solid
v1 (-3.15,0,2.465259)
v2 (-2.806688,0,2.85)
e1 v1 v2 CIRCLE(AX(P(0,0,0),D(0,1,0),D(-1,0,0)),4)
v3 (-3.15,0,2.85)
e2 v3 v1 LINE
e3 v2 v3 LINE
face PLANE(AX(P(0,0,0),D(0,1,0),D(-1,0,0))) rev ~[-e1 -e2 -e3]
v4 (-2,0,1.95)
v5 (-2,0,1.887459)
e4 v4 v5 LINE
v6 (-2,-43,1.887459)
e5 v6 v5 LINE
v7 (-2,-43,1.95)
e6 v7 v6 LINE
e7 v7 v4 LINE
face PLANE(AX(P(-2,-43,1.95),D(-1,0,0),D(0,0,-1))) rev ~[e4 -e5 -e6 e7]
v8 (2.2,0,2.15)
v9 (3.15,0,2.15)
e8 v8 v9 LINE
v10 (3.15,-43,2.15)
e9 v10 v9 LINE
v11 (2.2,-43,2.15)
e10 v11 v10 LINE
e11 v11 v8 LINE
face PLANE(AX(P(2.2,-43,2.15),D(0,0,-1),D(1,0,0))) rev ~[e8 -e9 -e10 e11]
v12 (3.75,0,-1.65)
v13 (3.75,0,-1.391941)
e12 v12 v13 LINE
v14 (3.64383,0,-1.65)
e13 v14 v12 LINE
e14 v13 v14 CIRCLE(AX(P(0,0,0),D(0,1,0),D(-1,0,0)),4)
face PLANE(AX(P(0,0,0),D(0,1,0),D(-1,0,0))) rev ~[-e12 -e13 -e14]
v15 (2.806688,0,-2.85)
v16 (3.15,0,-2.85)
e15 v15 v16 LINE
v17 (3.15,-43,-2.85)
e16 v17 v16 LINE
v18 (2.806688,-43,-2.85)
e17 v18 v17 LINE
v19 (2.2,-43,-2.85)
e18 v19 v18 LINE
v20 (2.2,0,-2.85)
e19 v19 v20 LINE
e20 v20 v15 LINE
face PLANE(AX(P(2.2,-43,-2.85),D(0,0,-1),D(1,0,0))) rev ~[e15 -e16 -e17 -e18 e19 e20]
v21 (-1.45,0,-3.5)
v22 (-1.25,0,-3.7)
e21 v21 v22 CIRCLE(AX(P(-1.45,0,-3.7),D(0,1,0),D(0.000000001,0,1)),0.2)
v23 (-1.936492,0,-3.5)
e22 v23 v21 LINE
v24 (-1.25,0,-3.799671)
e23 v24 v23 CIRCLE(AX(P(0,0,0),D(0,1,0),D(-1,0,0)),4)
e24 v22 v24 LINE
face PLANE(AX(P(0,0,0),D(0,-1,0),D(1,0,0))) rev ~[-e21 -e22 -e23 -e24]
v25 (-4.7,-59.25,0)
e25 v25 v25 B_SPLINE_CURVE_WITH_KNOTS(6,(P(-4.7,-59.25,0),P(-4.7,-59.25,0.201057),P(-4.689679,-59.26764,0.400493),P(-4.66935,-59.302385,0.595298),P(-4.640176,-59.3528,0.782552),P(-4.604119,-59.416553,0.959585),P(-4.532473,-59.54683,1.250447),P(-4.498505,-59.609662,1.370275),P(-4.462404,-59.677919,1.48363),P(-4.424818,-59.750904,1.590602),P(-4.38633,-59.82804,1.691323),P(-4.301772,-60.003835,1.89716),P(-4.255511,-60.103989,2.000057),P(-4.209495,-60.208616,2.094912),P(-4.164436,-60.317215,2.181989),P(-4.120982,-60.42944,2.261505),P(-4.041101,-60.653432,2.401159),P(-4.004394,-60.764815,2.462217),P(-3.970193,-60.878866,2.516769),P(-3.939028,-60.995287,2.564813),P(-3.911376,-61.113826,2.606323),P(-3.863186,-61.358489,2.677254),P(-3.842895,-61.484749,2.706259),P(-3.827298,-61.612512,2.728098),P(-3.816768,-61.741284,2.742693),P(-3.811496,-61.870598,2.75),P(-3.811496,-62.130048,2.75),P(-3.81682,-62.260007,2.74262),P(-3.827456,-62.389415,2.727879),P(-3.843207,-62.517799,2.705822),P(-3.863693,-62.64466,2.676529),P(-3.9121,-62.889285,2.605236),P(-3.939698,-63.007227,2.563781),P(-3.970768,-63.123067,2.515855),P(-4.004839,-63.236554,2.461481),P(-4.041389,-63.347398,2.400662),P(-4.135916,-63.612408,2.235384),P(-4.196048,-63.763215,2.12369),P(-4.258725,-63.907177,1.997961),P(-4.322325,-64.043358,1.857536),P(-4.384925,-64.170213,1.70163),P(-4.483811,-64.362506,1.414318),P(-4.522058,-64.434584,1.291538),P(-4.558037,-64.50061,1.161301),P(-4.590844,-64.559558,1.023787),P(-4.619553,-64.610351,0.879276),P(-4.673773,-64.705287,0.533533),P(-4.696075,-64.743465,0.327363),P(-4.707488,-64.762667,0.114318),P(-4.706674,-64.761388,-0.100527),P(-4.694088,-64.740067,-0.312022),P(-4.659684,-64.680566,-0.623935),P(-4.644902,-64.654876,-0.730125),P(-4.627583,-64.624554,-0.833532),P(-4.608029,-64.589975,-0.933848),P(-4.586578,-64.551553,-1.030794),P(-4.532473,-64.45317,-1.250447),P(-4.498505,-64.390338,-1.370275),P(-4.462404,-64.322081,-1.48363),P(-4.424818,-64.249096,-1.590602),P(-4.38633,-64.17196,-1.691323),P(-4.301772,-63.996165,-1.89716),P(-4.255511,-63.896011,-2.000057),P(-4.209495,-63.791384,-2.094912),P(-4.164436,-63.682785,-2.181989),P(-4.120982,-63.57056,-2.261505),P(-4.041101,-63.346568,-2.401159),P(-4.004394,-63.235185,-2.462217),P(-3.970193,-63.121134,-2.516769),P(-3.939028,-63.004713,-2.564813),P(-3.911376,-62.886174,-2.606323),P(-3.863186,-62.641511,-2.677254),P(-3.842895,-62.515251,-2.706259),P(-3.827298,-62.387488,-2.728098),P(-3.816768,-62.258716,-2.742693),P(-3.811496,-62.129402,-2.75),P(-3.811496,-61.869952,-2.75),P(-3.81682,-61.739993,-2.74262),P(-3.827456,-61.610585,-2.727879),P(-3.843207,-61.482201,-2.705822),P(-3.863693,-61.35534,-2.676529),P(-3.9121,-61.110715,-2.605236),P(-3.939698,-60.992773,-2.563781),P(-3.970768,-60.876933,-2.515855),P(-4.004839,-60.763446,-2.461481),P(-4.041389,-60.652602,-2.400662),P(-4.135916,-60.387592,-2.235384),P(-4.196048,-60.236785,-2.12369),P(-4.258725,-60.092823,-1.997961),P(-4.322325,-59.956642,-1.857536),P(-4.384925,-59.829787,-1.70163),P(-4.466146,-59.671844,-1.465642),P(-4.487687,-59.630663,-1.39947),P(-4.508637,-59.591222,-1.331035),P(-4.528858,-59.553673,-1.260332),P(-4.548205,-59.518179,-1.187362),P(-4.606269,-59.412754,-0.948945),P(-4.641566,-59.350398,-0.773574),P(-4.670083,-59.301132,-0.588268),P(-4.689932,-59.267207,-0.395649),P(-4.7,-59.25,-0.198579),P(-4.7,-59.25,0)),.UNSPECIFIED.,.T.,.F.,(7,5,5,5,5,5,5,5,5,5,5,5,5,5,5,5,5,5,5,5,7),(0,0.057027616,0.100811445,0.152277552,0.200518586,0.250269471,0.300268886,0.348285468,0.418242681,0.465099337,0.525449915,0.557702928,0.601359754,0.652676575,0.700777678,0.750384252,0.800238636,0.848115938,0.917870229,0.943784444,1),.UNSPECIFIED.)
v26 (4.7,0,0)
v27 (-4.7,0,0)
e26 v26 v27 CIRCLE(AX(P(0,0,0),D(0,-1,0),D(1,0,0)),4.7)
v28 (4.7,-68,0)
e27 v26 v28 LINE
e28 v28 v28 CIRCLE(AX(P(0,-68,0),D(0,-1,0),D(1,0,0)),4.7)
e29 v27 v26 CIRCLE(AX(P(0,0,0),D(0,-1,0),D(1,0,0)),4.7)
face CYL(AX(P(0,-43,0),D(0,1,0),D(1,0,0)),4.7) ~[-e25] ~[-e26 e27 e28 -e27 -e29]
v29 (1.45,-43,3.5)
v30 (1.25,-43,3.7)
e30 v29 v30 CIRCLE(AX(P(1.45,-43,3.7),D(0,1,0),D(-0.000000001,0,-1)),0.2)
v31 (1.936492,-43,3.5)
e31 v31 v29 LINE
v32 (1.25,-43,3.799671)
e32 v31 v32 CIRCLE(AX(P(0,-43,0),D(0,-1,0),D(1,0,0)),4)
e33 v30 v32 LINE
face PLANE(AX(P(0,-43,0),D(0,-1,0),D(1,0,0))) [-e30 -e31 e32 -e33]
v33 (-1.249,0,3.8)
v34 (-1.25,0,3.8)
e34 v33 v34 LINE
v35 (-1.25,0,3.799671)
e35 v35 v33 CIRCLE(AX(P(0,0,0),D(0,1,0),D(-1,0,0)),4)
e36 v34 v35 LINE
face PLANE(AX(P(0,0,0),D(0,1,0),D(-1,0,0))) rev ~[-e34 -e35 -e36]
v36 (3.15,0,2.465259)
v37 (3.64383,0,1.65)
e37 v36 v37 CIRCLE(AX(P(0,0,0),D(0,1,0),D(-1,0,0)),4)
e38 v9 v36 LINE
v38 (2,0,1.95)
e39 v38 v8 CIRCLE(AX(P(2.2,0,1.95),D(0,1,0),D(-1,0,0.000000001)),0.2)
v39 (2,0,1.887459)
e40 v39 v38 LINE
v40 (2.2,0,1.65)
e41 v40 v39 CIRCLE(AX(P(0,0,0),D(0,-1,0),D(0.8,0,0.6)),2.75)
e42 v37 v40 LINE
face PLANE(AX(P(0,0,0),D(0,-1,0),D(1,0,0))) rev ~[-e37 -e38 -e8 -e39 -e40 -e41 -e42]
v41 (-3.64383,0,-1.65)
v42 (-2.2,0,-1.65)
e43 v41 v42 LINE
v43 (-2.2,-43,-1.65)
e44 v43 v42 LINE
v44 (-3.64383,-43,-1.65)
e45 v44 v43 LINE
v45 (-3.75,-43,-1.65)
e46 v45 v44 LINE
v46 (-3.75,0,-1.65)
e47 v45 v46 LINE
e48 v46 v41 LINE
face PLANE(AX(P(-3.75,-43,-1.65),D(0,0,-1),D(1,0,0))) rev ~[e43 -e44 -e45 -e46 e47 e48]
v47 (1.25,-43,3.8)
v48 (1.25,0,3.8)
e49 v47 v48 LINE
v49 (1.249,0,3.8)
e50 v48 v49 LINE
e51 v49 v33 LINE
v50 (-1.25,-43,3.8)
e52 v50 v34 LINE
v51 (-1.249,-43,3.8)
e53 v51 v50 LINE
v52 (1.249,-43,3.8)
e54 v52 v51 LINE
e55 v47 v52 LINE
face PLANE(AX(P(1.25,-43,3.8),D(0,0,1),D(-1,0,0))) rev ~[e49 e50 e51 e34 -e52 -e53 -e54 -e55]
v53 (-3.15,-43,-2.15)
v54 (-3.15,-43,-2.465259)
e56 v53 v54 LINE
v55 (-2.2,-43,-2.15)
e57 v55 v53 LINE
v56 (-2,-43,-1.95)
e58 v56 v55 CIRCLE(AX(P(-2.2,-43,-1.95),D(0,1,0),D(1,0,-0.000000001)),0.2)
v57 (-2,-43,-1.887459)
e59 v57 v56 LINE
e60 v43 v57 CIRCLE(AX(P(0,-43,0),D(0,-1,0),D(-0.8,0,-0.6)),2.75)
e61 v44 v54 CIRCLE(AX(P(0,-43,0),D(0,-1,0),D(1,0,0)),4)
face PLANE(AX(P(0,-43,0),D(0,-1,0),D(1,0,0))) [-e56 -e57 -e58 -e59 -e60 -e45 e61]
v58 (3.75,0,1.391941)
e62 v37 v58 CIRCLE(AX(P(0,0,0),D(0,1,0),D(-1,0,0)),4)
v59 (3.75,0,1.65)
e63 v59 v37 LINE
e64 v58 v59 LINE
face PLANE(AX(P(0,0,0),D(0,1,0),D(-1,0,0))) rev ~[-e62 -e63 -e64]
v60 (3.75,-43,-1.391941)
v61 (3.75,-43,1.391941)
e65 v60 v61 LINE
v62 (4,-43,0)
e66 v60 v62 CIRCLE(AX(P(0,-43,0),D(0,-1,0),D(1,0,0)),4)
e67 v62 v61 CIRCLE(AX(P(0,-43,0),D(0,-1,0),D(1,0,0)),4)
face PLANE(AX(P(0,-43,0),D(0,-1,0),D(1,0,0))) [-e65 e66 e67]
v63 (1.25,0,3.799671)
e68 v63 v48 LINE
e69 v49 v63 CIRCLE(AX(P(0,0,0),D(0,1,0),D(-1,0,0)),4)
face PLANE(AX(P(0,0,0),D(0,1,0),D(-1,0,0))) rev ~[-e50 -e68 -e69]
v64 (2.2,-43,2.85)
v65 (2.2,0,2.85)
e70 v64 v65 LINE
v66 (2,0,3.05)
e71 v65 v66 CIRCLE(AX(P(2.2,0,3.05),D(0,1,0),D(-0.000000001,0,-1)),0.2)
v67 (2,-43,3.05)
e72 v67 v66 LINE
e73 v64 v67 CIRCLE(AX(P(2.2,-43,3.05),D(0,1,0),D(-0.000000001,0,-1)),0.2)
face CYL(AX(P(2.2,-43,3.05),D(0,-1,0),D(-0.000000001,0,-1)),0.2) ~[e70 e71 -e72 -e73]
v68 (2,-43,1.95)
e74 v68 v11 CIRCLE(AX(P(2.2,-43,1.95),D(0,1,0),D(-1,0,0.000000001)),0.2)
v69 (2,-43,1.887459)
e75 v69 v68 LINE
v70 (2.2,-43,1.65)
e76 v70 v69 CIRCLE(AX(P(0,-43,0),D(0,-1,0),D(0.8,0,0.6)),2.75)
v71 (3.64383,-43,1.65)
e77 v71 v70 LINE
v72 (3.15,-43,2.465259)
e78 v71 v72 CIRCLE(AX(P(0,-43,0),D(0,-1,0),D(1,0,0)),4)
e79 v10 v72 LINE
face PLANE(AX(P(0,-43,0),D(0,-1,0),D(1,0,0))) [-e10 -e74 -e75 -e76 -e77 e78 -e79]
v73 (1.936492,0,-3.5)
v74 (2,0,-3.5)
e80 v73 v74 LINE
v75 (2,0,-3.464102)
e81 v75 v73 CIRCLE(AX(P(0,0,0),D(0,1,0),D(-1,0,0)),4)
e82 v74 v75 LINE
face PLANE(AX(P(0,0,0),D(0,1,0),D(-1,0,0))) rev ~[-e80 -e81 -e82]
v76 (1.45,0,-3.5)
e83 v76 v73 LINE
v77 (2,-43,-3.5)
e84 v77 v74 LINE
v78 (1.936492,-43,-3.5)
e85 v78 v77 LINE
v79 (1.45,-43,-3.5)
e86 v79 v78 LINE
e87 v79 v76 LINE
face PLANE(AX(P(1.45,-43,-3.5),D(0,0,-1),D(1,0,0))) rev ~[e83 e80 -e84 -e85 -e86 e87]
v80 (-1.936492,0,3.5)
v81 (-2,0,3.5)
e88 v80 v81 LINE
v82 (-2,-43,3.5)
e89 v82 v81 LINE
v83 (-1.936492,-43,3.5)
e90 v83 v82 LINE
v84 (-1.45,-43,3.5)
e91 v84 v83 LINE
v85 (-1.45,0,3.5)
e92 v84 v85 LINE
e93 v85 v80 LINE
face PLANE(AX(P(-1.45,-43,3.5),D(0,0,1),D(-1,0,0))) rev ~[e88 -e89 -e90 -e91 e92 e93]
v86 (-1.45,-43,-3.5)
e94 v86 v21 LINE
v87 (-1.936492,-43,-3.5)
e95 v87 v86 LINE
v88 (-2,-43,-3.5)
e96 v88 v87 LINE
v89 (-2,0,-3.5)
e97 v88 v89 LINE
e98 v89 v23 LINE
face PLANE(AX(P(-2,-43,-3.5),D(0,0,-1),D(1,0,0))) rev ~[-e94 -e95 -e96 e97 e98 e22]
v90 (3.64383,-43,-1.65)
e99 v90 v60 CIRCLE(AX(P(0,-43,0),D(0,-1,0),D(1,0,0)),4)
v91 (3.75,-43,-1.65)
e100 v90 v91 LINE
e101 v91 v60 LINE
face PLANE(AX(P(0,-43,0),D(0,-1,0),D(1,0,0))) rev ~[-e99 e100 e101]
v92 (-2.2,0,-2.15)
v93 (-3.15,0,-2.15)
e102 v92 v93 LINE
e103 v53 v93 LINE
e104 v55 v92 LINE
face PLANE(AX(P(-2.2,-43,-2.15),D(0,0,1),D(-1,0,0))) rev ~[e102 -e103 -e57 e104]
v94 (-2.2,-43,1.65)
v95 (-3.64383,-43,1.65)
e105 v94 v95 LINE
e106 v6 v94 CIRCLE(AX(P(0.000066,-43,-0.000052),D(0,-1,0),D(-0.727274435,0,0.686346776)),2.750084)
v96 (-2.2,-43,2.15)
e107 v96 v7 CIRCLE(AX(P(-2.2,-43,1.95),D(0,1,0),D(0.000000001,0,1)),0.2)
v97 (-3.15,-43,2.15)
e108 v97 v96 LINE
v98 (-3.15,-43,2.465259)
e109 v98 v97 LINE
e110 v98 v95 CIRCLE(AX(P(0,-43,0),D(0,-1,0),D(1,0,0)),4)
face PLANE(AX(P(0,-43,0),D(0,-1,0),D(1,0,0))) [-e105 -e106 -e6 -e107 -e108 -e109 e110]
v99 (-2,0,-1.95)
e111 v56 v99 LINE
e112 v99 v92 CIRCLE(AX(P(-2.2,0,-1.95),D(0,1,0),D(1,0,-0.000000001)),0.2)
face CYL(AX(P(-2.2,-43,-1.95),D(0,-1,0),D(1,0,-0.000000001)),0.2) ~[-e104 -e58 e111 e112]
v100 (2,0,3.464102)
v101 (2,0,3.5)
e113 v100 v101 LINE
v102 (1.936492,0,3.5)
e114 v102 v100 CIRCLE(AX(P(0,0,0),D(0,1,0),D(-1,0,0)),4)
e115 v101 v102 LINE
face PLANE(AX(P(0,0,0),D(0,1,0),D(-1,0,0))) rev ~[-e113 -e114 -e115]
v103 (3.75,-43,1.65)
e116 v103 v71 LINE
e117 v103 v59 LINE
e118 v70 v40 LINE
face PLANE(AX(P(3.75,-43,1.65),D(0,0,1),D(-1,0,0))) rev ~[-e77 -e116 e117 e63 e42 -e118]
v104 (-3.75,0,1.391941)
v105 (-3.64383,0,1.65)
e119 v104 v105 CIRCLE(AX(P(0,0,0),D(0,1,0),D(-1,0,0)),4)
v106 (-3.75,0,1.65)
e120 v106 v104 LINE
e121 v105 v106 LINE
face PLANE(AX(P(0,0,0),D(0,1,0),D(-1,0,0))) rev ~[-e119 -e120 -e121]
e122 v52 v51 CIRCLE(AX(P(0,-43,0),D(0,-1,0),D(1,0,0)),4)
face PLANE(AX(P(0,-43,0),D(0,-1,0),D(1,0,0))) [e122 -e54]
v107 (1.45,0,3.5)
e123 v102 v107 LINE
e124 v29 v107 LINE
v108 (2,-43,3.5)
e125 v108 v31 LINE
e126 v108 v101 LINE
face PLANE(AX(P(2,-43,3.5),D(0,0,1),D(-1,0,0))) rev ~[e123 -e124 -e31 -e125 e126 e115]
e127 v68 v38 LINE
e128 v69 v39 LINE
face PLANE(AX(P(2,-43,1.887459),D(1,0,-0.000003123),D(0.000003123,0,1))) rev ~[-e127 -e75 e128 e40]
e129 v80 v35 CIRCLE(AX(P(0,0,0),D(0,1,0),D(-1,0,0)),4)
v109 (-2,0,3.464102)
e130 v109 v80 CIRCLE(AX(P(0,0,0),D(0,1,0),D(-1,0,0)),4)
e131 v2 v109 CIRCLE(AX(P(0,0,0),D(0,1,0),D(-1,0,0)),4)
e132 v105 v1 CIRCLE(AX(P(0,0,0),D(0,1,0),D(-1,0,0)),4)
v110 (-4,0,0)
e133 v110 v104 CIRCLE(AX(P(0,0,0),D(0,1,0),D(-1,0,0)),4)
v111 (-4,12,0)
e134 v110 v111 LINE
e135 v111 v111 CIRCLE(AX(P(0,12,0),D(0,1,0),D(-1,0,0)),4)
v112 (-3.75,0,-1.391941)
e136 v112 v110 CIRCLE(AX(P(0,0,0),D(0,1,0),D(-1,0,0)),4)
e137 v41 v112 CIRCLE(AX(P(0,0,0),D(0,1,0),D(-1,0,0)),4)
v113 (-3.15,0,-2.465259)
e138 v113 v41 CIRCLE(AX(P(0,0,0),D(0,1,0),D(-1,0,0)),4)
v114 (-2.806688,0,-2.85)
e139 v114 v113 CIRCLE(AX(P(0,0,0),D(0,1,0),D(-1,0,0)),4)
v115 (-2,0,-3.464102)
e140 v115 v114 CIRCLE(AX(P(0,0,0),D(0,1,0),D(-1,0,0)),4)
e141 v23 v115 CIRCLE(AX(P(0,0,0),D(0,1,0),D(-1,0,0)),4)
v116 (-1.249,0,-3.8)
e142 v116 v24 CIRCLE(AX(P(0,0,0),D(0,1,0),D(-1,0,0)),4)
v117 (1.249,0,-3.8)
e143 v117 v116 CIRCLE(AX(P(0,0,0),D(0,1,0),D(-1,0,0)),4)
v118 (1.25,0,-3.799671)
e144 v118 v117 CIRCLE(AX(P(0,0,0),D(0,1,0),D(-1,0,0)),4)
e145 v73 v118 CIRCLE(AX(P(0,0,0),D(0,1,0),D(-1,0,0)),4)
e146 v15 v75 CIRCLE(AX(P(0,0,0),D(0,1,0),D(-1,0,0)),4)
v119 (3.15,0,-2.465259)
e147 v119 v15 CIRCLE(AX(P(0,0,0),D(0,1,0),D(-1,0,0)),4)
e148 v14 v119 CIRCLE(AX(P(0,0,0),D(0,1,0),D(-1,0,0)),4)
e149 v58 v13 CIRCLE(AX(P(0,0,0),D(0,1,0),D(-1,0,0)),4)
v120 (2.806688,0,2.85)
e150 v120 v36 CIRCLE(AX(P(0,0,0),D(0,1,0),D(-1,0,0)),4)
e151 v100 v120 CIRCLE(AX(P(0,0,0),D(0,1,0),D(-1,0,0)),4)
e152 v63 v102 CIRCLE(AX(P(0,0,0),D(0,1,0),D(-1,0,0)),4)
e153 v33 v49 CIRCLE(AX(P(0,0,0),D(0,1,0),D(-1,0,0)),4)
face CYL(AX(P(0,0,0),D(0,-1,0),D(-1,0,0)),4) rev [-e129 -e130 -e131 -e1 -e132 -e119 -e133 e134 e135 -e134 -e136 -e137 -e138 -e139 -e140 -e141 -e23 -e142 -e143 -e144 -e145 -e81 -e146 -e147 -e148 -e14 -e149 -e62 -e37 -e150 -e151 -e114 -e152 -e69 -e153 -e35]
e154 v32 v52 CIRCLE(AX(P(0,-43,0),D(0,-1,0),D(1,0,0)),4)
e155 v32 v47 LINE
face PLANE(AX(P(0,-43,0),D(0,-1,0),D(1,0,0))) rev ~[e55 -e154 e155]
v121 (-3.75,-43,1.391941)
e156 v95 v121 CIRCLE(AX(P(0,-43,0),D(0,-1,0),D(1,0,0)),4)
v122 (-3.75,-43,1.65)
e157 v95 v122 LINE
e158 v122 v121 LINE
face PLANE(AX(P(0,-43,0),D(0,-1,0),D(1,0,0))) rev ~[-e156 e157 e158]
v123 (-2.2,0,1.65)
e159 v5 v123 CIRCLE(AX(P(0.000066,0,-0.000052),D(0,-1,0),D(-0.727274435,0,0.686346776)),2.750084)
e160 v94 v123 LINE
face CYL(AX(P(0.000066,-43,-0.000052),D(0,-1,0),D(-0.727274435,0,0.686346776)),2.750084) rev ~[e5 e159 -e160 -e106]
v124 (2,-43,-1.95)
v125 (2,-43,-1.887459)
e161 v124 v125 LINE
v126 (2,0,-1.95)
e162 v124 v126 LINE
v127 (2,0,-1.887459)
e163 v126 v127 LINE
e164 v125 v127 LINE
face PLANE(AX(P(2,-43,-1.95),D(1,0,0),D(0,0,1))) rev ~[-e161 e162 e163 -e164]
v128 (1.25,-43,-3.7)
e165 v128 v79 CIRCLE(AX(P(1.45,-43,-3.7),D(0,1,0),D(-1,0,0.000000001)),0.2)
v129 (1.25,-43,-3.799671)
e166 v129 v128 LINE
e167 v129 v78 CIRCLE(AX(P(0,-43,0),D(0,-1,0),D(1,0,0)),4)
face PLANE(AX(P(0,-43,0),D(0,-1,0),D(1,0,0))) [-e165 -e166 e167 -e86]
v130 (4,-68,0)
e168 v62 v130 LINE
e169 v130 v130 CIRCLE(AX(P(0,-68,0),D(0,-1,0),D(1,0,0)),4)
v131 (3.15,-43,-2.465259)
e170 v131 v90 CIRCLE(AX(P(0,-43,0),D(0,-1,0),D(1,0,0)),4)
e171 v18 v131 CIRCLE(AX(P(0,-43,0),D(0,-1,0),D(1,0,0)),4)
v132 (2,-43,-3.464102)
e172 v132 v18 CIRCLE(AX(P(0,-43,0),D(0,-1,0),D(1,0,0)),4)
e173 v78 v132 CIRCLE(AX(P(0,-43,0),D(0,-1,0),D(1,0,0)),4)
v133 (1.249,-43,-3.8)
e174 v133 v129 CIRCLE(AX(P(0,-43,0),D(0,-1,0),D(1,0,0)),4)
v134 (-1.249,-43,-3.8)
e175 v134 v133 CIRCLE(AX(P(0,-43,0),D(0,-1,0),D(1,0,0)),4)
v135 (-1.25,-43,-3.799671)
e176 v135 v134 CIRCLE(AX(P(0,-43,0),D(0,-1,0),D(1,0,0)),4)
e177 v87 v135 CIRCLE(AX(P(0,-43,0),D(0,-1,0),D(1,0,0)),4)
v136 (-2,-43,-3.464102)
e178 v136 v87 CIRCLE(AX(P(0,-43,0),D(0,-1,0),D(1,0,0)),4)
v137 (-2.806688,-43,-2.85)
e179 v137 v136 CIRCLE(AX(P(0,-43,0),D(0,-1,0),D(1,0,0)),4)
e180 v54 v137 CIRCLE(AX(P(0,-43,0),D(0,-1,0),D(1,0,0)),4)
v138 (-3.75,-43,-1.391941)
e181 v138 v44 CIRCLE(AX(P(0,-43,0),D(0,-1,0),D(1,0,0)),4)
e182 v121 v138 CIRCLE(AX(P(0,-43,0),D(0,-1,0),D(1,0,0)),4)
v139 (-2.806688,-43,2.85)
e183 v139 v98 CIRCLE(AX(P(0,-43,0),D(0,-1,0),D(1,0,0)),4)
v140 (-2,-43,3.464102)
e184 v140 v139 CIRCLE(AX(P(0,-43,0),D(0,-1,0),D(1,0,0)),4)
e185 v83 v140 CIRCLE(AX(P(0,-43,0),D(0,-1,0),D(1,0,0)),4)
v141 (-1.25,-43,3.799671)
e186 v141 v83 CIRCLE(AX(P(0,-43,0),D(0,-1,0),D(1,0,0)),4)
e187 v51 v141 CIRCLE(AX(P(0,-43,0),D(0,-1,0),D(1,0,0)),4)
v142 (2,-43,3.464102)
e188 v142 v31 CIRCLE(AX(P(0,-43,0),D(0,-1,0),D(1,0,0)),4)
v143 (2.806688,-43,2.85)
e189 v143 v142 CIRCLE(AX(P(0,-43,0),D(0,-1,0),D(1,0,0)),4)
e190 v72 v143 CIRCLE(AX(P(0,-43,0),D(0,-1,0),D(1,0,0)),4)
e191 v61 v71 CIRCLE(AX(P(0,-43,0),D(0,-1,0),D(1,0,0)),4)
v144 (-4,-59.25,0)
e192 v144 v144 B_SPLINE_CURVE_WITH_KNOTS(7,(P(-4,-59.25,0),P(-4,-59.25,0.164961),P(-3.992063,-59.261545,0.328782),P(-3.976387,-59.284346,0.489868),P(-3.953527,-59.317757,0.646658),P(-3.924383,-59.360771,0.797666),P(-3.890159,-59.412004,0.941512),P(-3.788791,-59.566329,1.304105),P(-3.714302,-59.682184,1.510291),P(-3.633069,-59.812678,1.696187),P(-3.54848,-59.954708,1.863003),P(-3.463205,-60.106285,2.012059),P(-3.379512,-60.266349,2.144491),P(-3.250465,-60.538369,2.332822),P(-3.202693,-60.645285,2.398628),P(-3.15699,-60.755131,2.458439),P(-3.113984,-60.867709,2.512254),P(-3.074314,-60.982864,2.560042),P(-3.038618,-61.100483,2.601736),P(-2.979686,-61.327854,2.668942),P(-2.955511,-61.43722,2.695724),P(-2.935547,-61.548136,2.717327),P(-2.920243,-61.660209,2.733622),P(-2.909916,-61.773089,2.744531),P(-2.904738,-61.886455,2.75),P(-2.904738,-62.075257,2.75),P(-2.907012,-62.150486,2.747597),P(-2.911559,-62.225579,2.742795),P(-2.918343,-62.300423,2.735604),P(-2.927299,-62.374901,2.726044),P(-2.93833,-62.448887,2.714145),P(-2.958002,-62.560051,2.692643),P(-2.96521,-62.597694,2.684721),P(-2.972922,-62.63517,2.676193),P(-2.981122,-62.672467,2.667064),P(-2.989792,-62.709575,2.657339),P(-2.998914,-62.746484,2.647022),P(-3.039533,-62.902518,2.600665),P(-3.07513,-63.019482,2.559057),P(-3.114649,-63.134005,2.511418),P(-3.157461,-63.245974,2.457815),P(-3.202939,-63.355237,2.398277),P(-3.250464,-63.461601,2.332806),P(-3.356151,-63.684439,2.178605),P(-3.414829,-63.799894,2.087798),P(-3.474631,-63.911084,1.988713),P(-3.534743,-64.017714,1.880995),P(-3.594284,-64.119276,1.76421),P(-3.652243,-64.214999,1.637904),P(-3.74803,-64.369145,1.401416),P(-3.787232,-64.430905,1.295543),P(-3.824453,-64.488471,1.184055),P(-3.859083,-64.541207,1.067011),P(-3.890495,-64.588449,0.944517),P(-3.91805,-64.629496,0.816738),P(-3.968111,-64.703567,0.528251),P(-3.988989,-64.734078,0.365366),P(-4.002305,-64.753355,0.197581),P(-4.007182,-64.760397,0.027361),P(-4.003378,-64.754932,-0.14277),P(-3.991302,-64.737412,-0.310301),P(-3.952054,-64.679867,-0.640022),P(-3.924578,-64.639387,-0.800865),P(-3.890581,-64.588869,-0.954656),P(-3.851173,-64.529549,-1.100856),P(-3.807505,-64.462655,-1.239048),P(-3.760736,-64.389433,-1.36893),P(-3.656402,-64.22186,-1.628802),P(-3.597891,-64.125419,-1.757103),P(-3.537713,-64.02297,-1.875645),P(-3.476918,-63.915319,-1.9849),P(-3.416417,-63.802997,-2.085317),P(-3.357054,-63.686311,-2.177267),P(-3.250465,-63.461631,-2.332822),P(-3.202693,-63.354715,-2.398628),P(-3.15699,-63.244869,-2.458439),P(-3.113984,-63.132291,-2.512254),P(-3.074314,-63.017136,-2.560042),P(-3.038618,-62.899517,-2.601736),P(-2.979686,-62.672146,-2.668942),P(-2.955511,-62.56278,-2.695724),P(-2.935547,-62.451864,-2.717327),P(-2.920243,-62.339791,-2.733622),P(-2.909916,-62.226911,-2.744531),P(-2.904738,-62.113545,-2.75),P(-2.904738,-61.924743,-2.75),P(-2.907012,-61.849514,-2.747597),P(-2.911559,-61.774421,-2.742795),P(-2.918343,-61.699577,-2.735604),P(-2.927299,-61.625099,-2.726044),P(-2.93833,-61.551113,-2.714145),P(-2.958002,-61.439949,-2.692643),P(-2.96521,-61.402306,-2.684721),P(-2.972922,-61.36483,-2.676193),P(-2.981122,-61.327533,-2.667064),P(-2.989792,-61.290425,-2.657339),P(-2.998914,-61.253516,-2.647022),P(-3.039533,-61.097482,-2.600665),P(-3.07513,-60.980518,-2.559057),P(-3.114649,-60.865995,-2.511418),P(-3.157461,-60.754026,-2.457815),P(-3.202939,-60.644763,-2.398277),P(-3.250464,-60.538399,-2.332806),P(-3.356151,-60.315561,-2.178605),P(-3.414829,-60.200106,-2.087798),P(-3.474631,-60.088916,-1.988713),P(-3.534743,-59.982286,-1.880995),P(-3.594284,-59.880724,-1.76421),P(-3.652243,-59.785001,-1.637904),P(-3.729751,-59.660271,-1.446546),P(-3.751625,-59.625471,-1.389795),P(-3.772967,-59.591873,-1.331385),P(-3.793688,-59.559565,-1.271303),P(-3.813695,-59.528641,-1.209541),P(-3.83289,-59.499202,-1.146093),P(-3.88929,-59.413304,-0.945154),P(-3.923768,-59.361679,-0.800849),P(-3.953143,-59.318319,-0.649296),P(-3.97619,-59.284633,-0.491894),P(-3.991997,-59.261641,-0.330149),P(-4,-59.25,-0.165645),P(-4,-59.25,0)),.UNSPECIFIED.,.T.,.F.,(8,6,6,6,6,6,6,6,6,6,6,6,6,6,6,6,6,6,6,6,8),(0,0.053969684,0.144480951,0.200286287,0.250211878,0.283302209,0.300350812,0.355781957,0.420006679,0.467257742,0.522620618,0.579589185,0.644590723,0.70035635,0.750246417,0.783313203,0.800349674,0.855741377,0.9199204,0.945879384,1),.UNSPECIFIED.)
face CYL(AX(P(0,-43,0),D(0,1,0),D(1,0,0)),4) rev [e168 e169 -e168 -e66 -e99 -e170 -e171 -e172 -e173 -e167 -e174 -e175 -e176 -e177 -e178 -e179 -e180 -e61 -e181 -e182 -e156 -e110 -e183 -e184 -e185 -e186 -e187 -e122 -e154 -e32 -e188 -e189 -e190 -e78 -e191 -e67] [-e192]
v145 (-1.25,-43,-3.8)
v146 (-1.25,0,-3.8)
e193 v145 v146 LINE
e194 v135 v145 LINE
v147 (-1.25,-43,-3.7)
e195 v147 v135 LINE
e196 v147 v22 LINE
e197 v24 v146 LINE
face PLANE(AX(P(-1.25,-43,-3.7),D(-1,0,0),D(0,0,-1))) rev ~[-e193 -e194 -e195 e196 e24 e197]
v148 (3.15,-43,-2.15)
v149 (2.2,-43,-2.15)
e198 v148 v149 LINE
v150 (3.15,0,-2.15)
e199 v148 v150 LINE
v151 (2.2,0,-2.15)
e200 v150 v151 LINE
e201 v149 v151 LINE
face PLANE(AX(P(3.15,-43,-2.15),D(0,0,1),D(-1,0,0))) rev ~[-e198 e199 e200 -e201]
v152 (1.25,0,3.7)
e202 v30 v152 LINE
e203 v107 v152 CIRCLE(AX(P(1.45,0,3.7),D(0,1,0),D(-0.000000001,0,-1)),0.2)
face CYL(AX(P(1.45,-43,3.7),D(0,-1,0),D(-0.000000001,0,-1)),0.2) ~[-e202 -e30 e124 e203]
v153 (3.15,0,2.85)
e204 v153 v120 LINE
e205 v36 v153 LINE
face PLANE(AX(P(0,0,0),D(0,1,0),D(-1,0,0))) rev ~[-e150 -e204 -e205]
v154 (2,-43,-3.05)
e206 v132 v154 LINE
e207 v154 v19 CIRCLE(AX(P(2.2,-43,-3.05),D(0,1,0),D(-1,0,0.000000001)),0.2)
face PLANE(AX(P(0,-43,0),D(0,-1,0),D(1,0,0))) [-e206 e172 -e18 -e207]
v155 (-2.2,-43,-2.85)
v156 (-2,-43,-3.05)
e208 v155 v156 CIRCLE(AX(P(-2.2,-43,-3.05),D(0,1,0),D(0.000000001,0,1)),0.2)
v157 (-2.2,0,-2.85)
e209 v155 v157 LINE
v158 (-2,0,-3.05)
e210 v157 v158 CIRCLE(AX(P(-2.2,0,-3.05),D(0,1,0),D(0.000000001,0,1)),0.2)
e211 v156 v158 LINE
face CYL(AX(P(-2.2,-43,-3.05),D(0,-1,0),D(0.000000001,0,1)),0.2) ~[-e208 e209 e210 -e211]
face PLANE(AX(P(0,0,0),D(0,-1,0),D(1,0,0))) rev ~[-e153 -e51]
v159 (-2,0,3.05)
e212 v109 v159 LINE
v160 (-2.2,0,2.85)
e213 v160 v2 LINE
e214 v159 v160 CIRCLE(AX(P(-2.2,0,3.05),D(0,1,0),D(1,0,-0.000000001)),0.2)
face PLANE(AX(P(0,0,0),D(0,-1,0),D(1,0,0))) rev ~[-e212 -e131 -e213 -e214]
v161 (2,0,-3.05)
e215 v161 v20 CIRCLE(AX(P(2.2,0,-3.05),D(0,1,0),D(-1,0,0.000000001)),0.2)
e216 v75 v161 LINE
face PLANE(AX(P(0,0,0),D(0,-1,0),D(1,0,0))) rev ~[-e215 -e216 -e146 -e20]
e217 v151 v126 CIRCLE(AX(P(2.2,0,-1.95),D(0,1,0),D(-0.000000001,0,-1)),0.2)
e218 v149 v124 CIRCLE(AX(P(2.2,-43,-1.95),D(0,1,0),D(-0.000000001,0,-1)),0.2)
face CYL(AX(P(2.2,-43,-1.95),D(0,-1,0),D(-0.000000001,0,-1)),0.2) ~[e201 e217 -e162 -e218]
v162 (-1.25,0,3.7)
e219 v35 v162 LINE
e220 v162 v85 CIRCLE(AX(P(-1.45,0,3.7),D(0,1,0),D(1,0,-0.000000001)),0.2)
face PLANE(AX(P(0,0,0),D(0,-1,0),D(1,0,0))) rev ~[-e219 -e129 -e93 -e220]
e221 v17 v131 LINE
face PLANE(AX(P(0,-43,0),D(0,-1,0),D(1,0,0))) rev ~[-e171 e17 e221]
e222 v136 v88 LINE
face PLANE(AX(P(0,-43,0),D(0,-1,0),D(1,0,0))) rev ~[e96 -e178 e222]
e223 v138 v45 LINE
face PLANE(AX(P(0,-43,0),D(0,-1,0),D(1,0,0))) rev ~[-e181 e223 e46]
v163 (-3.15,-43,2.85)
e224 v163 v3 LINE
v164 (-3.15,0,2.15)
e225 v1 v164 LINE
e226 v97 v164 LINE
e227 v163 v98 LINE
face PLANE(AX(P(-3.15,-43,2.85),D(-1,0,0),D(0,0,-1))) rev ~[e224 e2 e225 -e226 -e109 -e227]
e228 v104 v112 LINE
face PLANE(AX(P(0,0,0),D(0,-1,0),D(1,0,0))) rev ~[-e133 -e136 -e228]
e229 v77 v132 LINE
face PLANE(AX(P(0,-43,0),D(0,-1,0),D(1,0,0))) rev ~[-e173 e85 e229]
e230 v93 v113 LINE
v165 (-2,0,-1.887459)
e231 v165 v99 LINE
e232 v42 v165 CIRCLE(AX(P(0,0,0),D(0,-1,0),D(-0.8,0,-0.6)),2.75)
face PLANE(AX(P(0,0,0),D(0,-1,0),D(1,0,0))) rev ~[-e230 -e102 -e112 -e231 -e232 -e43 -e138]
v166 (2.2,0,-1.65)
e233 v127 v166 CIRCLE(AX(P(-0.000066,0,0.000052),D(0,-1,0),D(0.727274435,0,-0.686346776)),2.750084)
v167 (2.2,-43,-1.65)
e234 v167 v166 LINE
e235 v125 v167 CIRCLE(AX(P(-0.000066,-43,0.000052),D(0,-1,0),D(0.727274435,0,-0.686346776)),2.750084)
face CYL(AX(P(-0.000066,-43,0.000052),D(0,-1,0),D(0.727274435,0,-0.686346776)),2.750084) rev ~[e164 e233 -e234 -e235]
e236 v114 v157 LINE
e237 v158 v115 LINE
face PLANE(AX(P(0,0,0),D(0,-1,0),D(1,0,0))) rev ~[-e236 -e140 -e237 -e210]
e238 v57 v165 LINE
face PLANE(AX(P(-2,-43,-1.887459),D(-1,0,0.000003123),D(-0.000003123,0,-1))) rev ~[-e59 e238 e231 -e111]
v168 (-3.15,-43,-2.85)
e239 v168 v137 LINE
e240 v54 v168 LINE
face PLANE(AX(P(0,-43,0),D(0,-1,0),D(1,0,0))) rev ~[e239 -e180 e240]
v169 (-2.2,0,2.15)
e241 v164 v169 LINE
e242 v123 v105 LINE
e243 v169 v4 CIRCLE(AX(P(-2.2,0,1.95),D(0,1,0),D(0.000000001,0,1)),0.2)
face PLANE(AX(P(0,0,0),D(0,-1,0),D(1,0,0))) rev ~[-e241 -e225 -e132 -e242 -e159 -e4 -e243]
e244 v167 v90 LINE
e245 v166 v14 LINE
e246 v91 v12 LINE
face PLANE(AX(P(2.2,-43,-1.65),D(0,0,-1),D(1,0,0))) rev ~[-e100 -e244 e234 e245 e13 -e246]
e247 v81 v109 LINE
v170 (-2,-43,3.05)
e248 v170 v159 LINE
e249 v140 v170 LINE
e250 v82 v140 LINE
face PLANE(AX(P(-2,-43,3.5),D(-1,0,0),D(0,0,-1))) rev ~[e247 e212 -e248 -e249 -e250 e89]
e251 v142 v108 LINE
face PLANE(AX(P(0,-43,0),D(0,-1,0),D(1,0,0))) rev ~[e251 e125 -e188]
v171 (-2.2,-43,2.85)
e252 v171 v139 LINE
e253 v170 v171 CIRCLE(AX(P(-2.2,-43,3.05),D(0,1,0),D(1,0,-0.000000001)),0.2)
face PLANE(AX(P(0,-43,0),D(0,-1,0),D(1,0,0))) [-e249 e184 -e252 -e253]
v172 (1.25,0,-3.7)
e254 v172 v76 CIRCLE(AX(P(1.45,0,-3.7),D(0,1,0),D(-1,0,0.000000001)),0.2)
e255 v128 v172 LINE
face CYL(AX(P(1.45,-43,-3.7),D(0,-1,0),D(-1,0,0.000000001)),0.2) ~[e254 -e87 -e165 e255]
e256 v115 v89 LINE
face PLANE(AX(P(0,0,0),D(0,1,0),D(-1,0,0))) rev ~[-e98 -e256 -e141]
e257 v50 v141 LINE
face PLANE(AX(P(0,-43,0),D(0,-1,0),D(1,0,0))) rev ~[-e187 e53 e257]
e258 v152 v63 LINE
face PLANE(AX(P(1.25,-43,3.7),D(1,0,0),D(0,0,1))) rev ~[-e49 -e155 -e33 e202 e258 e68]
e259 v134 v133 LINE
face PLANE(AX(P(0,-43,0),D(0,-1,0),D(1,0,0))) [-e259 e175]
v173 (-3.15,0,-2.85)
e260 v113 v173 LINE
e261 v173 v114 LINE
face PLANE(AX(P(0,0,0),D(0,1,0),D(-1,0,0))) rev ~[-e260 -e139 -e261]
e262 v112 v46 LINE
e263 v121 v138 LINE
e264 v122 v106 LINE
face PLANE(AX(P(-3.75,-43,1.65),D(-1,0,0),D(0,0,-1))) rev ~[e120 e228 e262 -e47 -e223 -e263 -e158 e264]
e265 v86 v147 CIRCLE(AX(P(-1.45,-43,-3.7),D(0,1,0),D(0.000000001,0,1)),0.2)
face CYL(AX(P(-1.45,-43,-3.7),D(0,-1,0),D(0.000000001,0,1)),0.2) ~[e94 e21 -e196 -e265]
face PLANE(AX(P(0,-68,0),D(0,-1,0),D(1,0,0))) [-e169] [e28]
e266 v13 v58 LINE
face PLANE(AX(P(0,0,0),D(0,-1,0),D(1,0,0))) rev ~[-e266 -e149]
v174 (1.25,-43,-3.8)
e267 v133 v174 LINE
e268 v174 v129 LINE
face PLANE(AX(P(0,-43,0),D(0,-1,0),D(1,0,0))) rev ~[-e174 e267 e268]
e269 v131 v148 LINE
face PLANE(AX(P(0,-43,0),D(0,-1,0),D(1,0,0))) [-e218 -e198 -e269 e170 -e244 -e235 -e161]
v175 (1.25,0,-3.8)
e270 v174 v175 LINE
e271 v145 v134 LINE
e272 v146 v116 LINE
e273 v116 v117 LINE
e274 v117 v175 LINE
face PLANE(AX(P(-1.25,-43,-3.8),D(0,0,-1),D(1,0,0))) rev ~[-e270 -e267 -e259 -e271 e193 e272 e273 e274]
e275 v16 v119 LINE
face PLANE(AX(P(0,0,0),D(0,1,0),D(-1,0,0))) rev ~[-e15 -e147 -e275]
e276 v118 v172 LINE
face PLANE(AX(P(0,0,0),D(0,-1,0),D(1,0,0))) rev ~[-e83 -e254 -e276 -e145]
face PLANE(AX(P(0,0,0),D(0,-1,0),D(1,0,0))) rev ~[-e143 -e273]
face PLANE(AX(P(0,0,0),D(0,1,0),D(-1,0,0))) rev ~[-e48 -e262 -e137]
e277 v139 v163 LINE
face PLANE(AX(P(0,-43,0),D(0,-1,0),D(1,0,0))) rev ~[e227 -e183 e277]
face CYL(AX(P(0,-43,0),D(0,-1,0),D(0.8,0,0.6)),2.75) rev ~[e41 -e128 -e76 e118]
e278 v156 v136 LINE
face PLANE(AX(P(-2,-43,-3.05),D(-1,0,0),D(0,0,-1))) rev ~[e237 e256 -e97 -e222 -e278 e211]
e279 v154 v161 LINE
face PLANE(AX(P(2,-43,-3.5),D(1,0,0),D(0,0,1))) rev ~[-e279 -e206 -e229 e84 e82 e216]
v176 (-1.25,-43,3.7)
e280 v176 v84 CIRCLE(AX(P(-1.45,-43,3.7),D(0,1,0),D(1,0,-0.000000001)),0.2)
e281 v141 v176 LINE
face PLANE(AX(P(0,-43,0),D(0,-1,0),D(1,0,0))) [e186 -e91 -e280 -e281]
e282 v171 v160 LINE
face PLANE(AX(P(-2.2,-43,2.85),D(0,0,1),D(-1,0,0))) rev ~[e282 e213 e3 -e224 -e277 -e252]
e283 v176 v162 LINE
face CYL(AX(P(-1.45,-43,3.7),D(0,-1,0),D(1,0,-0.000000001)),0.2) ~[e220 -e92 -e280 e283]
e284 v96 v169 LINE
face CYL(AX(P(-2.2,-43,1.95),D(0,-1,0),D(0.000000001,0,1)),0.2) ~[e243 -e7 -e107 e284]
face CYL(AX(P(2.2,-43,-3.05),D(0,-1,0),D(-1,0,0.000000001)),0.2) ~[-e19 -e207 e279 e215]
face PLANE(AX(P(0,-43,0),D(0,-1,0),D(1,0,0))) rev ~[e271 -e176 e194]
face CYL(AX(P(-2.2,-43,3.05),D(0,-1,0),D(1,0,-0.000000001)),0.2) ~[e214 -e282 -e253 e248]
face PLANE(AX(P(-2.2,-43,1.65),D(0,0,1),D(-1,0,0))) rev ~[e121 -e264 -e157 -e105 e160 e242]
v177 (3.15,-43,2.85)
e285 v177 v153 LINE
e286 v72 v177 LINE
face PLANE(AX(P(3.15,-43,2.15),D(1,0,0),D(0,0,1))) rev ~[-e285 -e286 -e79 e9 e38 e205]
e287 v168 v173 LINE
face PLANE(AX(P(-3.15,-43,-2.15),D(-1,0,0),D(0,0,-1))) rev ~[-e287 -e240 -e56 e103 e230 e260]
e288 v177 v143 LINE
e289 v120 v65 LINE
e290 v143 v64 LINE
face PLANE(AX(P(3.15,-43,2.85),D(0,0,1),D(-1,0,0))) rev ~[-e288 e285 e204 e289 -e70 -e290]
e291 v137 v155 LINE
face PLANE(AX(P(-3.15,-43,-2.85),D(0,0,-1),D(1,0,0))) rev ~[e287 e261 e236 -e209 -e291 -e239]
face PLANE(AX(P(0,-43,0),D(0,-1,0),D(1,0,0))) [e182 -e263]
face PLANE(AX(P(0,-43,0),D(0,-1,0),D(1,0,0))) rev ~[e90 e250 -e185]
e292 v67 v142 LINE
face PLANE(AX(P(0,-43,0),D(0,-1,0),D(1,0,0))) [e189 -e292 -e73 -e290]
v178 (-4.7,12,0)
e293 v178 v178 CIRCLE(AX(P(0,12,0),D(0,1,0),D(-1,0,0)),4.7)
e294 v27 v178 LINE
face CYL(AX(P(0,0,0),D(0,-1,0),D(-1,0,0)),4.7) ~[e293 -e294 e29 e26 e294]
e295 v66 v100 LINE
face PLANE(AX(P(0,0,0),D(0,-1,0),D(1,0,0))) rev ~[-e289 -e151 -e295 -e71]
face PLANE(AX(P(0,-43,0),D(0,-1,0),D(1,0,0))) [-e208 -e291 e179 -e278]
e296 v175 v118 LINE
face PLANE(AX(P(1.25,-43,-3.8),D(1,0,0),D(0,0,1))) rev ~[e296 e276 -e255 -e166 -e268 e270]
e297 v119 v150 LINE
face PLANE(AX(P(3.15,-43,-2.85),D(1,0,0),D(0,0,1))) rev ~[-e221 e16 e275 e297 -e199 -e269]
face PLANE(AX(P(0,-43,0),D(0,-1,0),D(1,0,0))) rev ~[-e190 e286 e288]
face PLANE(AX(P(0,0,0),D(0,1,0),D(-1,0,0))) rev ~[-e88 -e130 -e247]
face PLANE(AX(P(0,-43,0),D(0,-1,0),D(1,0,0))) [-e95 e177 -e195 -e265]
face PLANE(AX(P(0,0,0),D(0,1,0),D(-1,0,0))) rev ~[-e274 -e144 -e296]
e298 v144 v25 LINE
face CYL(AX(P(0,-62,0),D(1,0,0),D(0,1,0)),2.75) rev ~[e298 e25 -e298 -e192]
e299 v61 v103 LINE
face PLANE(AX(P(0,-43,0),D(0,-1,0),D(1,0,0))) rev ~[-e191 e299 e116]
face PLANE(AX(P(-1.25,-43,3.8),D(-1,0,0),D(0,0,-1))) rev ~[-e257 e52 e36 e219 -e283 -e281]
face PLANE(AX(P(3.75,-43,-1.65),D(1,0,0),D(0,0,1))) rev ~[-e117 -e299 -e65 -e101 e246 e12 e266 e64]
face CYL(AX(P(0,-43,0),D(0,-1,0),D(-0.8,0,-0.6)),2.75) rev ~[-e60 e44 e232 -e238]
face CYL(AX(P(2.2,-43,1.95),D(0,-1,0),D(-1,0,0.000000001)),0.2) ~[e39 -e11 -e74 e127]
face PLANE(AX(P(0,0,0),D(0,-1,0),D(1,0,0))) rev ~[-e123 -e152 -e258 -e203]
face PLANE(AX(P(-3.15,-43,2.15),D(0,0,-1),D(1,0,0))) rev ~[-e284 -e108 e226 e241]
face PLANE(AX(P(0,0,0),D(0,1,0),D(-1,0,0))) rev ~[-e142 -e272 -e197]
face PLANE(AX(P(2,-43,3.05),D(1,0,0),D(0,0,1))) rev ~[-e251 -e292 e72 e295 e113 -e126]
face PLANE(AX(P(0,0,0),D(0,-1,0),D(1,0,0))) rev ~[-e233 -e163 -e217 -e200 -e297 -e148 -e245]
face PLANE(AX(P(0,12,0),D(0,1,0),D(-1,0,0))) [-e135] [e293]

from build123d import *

# Parameters (mm, degrees)
F3_R      = 4.7
F4_DEPTH  = 43
F8_DEPTH  = 43
F6_R      = 4.7
F6_R_2    = 4
F9_DEPTH  = 25
F7_R      = 4.7
F7_R_2    = 4
F10_DEPTH = 12
F11_R     = 2.75
F12_DEPTH = 4.701


# Not quite as in the source:
# - ends of sketch curves that miss each other by under 0.0002 mm in the source are joined


with BuildPart() as f4:
    # F3 (on Front) → F4 (new body)
    with BuildSketch(Plane.XZ):
        Circle(F3_R)
    extrude(amount=F4_DEPTH)

    # F5 (on face) → F8 (cut, through all)
    with BuildSketch(Plane.XZ.offset(43)):
        with BuildLine():
            Line((-1.25, -3.8), (0, -3.8))
            Line((0, -3.8), (1.25, -3.8))
            Line((1.25, -3.8), (1.25, -3.7))
            ThreePointArc((1.25, -3.7), (1.3085786438, -3.5585786438), (1.45, -3.5))
            Line((1.45, -3.5), (2, -3.5))
            Line((2, -3.5), (2, -3.05))
            ThreePointArc((2, -3.05), (2.0585786438, -2.9085786438), (2.2, -2.85))
            Line((2.2, -2.85), (3.15, -2.85))
            Line((3.15, -2.85), (3.15, -2.15))
            Line((3.15, -2.15), (2.2, -2.15))
            ThreePointArc((2.2, -2.15), (2.0585786438, -2.0914213562), (2, -1.95))
            Line((2, -1.95), (2, -1.887459))
            ThreePointArc((2, -1.887459), (2.1033535752, -1.771554046), (2.2, -1.65))
            Line((2.2, -1.65), (3.75, -1.65))
            Line((3.75, -1.65), (3.75, 0))
            Line((3.75, 0), (3.75, 1.65))
            Line((3.75, 1.65), (2.2, 1.65))
            ThreePointArc((2.2, 1.65), (2.1033535752, 1.771554046), (1.9999998047, 1.8874588157))
            Line((1.9999998047, 1.8874588157), (2, 1.95))
            ThreePointArc((2, 1.95), (2.0585786438, 2.0914213562), (2.2, 2.15))
            Line((2.2, 2.15), (3.15, 2.15))
            Line((3.15, 2.15), (3.15, 2.85))
            Line((3.15, 2.85), (2.2, 2.85))
            ThreePointArc((2.2, 2.85), (2.0585786438, 2.9085786438), (2, 3.05))
            Line((2, 3.05), (2, 3.5))
            Line((2, 3.5), (1.45, 3.5))
            ThreePointArc((1.45, 3.5), (1.3085786438, 3.5585786438), (1.25, 3.7))
            Line((1.25, 3.7), (1.25, 3.8))
            Line((1.25, 3.8), (0, 3.8))
            Line((0, 3.8), (-1.25, 3.8))
            Line((-1.25, 3.8), (-1.25, 3.7))
            ThreePointArc((-1.25, 3.7), (-1.3085786438, 3.5585786438), (-1.45, 3.5))
            Line((-1.45, 3.5), (-2, 3.5))
            Line((-2, 3.5), (-2, 3.05))
            ThreePointArc((-2, 3.05), (-2.0585786438, 2.9085786438), (-2.2, 2.85))
            Line((-2.2, 2.85), (-3.15, 2.85))
            Line((-3.15, 2.85), (-3.15, 2.15))
            Line((-3.15, 2.15), (-2.2, 2.15))
            ThreePointArc((-2.2, 2.15), (-2.0585786438, 2.0914213562), (-2, 1.95))
            Line((-2, 1.95), (-2, 1.887459))
            ThreePointArc((-2, 1.887459), (-2.1033535752, 1.771554046), (-2.2, 1.65))
            Line((-2.2, 1.65), (-3.75, 1.65))
            Line((-3.75, 1.65), (-3.75, 0))
            Line((-3.75, 0), (-3.75, -1.65))
            Line((-3.75, -1.65), (-2.2, -1.65))
            ThreePointArc((-2.2, -1.65), (-2.1033535752, -1.771554046), (-1.9999998047, -1.8874588157))
            Line((-1.9999998047, -1.8874588157), (-2, -1.95))
            ThreePointArc((-2, -1.95), (-2.0585786438, -2.0914213562), (-2.2, -2.15))
            Line((-2.2, -2.15), (-3.15, -2.15))
            Line((-3.15, -2.15), (-3.15, -2.85))
            Line((-3.15, -2.85), (-2.2, -2.85))
            ThreePointArc((-2.2, -2.85), (-2.0585786438, -2.9085786438), (-2, -3.05))
            Line((-2, -3.05), (-2, -3.5))
            Line((-2, -3.5), (-1.45, -3.5))
            ThreePointArc((-1.45, -3.5), (-1.3085786438, -3.5585786438), (-1.25, -3.7))
            Line((-1.25, -3.7), (-1.25, -3.8))
        make_face()
    extrude(amount=-F8_DEPTH, mode=Mode.SUBTRACT)

    # F6 (on face) → F9 (join)
    with BuildSketch(Plane.XZ.offset(43)):
        Circle(F6_R)
        Circle(F6_R_2, mode=Mode.SUBTRACT)
    extrude(amount=F9_DEPTH)

    # F7 (on face) → F10 (join)
    with BuildSketch(Plane(origin=(0, 0, 0), x_dir=(-1, 0, 0), z_dir=(0, 1, 0))):
        Circle(F7_R)
        Circle(F7_R_2, mode=Mode.SUBTRACT)
    extrude(amount=F10_DEPTH)

    # F11 (on Right) → F12 (cut, through all)
    with BuildSketch(Plane.YZ):
        with Locations((-62, 0)):
            Circle(F11_R)
    extrude(amount=-F12_DEPTH, mode=Mode.SUBTRACT)


solid = f4.part
